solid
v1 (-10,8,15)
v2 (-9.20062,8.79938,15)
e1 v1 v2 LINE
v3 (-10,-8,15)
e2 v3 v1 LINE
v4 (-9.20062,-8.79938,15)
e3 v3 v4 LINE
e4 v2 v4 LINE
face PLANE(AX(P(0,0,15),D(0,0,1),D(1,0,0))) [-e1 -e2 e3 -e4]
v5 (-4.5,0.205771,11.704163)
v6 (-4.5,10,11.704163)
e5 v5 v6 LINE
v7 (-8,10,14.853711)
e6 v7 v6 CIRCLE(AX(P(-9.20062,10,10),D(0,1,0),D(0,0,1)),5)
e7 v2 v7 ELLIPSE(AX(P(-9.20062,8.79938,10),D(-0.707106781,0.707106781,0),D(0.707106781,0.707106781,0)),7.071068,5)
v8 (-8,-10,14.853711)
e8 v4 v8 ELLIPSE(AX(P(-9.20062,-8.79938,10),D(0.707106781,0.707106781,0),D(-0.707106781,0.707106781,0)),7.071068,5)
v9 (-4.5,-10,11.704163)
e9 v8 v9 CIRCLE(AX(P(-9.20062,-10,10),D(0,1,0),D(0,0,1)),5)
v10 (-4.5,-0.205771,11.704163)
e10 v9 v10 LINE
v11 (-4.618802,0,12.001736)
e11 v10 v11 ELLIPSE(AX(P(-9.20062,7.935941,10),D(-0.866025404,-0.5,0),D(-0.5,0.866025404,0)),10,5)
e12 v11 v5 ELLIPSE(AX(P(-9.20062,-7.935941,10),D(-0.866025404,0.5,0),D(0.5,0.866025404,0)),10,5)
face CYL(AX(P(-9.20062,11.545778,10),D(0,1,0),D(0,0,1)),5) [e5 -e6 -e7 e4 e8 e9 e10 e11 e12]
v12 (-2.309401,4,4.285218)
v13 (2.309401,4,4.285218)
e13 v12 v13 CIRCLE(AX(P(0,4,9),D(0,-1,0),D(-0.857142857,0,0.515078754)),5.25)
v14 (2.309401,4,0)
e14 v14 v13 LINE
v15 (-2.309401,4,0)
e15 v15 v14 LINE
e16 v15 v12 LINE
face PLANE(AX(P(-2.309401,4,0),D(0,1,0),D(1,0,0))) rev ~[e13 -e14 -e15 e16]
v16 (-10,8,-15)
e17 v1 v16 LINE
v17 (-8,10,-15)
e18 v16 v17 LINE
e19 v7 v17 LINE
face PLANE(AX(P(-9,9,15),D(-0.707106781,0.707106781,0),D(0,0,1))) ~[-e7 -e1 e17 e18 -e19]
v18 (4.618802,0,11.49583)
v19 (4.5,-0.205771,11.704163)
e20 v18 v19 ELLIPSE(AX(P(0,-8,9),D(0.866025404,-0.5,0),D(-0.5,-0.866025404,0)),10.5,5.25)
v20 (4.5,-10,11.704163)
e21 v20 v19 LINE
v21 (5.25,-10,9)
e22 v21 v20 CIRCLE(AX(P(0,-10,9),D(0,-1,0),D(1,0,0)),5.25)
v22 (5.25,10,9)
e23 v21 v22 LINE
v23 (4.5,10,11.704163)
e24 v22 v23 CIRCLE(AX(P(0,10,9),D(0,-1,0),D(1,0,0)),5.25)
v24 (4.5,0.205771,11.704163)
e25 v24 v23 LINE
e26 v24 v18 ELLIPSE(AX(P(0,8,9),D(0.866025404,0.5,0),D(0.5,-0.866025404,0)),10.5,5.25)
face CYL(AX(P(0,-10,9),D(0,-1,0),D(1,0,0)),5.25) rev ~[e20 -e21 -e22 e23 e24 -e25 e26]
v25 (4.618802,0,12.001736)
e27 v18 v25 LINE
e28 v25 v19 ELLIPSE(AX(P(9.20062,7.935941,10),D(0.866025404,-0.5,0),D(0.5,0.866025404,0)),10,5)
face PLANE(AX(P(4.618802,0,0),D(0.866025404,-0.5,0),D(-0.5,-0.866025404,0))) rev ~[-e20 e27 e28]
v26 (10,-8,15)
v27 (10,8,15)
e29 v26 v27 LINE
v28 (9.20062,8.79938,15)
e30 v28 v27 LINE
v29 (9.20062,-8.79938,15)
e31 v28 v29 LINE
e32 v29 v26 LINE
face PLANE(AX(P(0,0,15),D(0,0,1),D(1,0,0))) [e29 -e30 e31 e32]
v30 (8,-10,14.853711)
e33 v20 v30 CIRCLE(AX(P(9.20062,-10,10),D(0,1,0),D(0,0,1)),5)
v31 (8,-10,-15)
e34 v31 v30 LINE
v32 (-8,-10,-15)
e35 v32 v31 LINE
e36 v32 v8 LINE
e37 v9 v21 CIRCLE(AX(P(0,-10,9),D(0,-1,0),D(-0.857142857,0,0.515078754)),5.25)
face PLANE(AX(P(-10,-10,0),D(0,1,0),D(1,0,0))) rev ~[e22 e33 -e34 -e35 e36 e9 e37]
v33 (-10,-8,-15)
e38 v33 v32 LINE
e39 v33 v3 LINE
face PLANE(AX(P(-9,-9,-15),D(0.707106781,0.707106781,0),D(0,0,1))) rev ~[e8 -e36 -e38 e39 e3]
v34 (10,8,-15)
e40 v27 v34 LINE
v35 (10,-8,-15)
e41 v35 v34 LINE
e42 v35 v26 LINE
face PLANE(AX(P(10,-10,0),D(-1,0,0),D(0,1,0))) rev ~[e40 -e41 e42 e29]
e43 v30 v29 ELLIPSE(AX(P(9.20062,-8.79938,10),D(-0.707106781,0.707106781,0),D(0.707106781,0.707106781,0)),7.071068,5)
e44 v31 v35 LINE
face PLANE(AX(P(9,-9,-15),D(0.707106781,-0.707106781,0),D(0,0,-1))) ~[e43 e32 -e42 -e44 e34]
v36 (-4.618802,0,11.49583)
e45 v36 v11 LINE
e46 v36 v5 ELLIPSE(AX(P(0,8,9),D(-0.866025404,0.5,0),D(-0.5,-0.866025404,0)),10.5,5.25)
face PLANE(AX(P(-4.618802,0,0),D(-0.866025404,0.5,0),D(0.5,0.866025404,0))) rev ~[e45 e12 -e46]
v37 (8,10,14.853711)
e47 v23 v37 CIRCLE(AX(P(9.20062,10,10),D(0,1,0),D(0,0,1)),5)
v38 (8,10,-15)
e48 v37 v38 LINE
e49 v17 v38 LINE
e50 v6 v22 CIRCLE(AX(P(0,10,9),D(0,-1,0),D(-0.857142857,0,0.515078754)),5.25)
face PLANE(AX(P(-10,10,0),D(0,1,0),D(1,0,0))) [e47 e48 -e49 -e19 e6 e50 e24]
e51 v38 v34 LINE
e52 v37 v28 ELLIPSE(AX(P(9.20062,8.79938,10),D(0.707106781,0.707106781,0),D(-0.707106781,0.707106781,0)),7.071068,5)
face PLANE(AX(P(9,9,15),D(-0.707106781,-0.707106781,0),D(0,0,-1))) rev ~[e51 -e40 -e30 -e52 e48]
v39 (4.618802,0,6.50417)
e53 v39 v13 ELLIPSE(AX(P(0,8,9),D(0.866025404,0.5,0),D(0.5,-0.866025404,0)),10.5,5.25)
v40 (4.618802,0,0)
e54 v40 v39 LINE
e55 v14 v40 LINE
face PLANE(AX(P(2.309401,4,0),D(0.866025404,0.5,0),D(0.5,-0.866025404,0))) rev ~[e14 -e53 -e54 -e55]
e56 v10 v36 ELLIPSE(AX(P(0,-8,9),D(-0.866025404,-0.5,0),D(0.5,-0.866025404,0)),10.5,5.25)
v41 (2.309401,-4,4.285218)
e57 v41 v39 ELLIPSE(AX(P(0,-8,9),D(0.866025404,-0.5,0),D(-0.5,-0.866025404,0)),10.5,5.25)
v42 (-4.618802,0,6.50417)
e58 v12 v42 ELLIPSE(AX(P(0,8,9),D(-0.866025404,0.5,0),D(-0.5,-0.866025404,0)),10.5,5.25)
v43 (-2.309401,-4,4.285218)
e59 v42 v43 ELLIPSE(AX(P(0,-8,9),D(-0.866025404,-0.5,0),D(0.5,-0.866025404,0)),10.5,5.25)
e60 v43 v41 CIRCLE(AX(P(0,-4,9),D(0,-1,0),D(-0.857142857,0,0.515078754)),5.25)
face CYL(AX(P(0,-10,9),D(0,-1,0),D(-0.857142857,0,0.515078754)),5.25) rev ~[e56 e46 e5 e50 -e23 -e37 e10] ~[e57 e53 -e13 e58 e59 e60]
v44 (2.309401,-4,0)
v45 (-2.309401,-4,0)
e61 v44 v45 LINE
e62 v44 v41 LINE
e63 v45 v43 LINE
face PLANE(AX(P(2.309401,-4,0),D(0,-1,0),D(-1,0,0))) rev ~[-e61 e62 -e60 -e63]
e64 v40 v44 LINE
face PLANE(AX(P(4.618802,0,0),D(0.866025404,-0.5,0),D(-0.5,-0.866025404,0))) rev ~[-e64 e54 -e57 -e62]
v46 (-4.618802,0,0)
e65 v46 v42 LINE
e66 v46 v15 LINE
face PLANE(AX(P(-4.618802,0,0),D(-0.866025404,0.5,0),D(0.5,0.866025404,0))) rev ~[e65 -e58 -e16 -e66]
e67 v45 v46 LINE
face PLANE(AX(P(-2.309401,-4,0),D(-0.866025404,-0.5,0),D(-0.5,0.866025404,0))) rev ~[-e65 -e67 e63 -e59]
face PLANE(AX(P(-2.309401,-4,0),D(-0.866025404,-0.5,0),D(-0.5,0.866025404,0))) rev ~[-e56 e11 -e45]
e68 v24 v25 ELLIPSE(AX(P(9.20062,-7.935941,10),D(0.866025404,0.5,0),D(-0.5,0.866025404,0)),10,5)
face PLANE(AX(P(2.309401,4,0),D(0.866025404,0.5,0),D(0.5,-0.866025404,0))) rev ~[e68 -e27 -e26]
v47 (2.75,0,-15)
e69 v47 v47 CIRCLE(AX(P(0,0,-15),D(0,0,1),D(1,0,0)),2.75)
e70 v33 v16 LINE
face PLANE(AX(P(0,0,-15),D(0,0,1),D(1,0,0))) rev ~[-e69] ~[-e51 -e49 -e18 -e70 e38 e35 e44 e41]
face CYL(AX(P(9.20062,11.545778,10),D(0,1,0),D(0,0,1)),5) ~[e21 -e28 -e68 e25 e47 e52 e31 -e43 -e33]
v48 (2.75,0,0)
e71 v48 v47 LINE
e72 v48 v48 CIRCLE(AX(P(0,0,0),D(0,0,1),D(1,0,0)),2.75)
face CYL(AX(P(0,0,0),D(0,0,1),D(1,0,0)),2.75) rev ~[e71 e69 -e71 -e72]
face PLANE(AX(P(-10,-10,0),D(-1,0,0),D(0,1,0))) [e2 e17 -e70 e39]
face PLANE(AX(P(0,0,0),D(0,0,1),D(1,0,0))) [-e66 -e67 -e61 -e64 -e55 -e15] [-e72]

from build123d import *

# Parameters (mm, degrees)
F0_W        = 20
F0_H        = 20
F0_R        = 2.75
F1_DEPTH    = 15
F2_DEPTH    = 15
F4_DEPTH    = 20
F5_T1_DEPTH = 33.2973278516
F6_SIZE     = 2


# Not quite as in the source:
# - a fillet or chamfer that OpenCascade refuses, or shapes differently, is made with other operations: its cross-section is extruded or revolved along the edge and cut away or added


with BuildPart() as f1:
    # F0 (on Top) → F1 (new body)
    with BuildSketch(Plane.XY):
        Rectangle(F0_W, F0_H)
        Polygon((-4.6188021535, 0), (-2.3094010768, 4), (2.3094010768, 4), (4.6188021535, 0), (2.3094010768, -4), (-2.3094010768, -4), align=None, mode=Mode.SUBTRACT)
        Polygon((2.3094010768, 4), (-2.3094010768, 4), (-4.6188021535, 0), (-2.3094010768, -4), (2.3094010768, -4), (4.6188021535, 0), align=None)
        Circle(F0_R, mode=Mode.SUBTRACT)
    extrude(amount=-F1_DEPTH)

    # F0 (on Top) → F2 (join)
    with BuildSketch(Plane.XY):
        Rectangle(F0_W, F0_H)
        Polygon((-4.6188021535, 0), (-2.3094010768, 4), (2.3094010768, 4), (4.6188021535, 0), (2.3094010768, -4), (-2.3094010768, -4), align=None, mode=Mode.SUBTRACT)
    extrude(amount=F2_DEPTH)

    # F3 (on face) → F4 (cut, through all)
    with BuildSketch(Plane.XZ.offset(10)):
        with BuildLine():
            ThreePointArc((-4.5, 11.7041634566), (-1.40312152, 3.9409734138), (5.25, 9))
            ThreePointArc((5.25, 9), (5.0590265862, 10.40312152), (4.5, 11.7041634566))
            ThreePointArc((4.5, 11.7041634566), (0, 14.25), (-4.5, 11.7041634566))
        make_face()
        with BuildLine():
            ThreePointArc((-4.5, 11.7041634566), (0, 14.25), (4.5, 11.7041634566))
            Line((4.5, 11.7041634566), (4.5, 15))
            Line((4.5, 15), (-4.5, 15))
            Line((-4.5, 15), (-4.5, 11.7041634566))
        make_face()
    extrude(amount=-F4_DEPTH, mode=Mode.SUBTRACT)

    # F5: fillet of radius 5 on 2 edges, made by hand

    # F5_s2 → F5_t1 (cut)
    with BuildSketch(Plane.XZ.offset(-11.5457782428)):
        with BuildLine():
            ThreePointArc((-9.2006198435, 15), (-6.330151004, 14.0939478064), (-4.5, 11.7041634566))
            Line((-4.5, 11.7041634566), (-4.5, 15))
            Line((-4.5, 15), (-9.2006198435, 15))
        make_face()
        with BuildLine():
            ThreePointArc((9.2006198435, 15), (6.330151004, 14.0939478064), (4.5, 11.7041634566))
            Line((4.5, 11.7041634566), (4.5, 15))
            Line((4.5, 15), (9.2006198435, 15))
        make_face()
    extrude(amount=F5_T1_DEPTH, mode=Mode.SUBTRACT)

    # F6
    f6_edges = [f1.edges().sort_by_distance(p)[0] for p in [
        (-10, -10, 0),
        (10, -10, 0),
        (-10, 10, 0),
        (10, 10, 0),
    ]]
    chamfer(f6_edges, length=F6_SIZE)


solid = f1.part
